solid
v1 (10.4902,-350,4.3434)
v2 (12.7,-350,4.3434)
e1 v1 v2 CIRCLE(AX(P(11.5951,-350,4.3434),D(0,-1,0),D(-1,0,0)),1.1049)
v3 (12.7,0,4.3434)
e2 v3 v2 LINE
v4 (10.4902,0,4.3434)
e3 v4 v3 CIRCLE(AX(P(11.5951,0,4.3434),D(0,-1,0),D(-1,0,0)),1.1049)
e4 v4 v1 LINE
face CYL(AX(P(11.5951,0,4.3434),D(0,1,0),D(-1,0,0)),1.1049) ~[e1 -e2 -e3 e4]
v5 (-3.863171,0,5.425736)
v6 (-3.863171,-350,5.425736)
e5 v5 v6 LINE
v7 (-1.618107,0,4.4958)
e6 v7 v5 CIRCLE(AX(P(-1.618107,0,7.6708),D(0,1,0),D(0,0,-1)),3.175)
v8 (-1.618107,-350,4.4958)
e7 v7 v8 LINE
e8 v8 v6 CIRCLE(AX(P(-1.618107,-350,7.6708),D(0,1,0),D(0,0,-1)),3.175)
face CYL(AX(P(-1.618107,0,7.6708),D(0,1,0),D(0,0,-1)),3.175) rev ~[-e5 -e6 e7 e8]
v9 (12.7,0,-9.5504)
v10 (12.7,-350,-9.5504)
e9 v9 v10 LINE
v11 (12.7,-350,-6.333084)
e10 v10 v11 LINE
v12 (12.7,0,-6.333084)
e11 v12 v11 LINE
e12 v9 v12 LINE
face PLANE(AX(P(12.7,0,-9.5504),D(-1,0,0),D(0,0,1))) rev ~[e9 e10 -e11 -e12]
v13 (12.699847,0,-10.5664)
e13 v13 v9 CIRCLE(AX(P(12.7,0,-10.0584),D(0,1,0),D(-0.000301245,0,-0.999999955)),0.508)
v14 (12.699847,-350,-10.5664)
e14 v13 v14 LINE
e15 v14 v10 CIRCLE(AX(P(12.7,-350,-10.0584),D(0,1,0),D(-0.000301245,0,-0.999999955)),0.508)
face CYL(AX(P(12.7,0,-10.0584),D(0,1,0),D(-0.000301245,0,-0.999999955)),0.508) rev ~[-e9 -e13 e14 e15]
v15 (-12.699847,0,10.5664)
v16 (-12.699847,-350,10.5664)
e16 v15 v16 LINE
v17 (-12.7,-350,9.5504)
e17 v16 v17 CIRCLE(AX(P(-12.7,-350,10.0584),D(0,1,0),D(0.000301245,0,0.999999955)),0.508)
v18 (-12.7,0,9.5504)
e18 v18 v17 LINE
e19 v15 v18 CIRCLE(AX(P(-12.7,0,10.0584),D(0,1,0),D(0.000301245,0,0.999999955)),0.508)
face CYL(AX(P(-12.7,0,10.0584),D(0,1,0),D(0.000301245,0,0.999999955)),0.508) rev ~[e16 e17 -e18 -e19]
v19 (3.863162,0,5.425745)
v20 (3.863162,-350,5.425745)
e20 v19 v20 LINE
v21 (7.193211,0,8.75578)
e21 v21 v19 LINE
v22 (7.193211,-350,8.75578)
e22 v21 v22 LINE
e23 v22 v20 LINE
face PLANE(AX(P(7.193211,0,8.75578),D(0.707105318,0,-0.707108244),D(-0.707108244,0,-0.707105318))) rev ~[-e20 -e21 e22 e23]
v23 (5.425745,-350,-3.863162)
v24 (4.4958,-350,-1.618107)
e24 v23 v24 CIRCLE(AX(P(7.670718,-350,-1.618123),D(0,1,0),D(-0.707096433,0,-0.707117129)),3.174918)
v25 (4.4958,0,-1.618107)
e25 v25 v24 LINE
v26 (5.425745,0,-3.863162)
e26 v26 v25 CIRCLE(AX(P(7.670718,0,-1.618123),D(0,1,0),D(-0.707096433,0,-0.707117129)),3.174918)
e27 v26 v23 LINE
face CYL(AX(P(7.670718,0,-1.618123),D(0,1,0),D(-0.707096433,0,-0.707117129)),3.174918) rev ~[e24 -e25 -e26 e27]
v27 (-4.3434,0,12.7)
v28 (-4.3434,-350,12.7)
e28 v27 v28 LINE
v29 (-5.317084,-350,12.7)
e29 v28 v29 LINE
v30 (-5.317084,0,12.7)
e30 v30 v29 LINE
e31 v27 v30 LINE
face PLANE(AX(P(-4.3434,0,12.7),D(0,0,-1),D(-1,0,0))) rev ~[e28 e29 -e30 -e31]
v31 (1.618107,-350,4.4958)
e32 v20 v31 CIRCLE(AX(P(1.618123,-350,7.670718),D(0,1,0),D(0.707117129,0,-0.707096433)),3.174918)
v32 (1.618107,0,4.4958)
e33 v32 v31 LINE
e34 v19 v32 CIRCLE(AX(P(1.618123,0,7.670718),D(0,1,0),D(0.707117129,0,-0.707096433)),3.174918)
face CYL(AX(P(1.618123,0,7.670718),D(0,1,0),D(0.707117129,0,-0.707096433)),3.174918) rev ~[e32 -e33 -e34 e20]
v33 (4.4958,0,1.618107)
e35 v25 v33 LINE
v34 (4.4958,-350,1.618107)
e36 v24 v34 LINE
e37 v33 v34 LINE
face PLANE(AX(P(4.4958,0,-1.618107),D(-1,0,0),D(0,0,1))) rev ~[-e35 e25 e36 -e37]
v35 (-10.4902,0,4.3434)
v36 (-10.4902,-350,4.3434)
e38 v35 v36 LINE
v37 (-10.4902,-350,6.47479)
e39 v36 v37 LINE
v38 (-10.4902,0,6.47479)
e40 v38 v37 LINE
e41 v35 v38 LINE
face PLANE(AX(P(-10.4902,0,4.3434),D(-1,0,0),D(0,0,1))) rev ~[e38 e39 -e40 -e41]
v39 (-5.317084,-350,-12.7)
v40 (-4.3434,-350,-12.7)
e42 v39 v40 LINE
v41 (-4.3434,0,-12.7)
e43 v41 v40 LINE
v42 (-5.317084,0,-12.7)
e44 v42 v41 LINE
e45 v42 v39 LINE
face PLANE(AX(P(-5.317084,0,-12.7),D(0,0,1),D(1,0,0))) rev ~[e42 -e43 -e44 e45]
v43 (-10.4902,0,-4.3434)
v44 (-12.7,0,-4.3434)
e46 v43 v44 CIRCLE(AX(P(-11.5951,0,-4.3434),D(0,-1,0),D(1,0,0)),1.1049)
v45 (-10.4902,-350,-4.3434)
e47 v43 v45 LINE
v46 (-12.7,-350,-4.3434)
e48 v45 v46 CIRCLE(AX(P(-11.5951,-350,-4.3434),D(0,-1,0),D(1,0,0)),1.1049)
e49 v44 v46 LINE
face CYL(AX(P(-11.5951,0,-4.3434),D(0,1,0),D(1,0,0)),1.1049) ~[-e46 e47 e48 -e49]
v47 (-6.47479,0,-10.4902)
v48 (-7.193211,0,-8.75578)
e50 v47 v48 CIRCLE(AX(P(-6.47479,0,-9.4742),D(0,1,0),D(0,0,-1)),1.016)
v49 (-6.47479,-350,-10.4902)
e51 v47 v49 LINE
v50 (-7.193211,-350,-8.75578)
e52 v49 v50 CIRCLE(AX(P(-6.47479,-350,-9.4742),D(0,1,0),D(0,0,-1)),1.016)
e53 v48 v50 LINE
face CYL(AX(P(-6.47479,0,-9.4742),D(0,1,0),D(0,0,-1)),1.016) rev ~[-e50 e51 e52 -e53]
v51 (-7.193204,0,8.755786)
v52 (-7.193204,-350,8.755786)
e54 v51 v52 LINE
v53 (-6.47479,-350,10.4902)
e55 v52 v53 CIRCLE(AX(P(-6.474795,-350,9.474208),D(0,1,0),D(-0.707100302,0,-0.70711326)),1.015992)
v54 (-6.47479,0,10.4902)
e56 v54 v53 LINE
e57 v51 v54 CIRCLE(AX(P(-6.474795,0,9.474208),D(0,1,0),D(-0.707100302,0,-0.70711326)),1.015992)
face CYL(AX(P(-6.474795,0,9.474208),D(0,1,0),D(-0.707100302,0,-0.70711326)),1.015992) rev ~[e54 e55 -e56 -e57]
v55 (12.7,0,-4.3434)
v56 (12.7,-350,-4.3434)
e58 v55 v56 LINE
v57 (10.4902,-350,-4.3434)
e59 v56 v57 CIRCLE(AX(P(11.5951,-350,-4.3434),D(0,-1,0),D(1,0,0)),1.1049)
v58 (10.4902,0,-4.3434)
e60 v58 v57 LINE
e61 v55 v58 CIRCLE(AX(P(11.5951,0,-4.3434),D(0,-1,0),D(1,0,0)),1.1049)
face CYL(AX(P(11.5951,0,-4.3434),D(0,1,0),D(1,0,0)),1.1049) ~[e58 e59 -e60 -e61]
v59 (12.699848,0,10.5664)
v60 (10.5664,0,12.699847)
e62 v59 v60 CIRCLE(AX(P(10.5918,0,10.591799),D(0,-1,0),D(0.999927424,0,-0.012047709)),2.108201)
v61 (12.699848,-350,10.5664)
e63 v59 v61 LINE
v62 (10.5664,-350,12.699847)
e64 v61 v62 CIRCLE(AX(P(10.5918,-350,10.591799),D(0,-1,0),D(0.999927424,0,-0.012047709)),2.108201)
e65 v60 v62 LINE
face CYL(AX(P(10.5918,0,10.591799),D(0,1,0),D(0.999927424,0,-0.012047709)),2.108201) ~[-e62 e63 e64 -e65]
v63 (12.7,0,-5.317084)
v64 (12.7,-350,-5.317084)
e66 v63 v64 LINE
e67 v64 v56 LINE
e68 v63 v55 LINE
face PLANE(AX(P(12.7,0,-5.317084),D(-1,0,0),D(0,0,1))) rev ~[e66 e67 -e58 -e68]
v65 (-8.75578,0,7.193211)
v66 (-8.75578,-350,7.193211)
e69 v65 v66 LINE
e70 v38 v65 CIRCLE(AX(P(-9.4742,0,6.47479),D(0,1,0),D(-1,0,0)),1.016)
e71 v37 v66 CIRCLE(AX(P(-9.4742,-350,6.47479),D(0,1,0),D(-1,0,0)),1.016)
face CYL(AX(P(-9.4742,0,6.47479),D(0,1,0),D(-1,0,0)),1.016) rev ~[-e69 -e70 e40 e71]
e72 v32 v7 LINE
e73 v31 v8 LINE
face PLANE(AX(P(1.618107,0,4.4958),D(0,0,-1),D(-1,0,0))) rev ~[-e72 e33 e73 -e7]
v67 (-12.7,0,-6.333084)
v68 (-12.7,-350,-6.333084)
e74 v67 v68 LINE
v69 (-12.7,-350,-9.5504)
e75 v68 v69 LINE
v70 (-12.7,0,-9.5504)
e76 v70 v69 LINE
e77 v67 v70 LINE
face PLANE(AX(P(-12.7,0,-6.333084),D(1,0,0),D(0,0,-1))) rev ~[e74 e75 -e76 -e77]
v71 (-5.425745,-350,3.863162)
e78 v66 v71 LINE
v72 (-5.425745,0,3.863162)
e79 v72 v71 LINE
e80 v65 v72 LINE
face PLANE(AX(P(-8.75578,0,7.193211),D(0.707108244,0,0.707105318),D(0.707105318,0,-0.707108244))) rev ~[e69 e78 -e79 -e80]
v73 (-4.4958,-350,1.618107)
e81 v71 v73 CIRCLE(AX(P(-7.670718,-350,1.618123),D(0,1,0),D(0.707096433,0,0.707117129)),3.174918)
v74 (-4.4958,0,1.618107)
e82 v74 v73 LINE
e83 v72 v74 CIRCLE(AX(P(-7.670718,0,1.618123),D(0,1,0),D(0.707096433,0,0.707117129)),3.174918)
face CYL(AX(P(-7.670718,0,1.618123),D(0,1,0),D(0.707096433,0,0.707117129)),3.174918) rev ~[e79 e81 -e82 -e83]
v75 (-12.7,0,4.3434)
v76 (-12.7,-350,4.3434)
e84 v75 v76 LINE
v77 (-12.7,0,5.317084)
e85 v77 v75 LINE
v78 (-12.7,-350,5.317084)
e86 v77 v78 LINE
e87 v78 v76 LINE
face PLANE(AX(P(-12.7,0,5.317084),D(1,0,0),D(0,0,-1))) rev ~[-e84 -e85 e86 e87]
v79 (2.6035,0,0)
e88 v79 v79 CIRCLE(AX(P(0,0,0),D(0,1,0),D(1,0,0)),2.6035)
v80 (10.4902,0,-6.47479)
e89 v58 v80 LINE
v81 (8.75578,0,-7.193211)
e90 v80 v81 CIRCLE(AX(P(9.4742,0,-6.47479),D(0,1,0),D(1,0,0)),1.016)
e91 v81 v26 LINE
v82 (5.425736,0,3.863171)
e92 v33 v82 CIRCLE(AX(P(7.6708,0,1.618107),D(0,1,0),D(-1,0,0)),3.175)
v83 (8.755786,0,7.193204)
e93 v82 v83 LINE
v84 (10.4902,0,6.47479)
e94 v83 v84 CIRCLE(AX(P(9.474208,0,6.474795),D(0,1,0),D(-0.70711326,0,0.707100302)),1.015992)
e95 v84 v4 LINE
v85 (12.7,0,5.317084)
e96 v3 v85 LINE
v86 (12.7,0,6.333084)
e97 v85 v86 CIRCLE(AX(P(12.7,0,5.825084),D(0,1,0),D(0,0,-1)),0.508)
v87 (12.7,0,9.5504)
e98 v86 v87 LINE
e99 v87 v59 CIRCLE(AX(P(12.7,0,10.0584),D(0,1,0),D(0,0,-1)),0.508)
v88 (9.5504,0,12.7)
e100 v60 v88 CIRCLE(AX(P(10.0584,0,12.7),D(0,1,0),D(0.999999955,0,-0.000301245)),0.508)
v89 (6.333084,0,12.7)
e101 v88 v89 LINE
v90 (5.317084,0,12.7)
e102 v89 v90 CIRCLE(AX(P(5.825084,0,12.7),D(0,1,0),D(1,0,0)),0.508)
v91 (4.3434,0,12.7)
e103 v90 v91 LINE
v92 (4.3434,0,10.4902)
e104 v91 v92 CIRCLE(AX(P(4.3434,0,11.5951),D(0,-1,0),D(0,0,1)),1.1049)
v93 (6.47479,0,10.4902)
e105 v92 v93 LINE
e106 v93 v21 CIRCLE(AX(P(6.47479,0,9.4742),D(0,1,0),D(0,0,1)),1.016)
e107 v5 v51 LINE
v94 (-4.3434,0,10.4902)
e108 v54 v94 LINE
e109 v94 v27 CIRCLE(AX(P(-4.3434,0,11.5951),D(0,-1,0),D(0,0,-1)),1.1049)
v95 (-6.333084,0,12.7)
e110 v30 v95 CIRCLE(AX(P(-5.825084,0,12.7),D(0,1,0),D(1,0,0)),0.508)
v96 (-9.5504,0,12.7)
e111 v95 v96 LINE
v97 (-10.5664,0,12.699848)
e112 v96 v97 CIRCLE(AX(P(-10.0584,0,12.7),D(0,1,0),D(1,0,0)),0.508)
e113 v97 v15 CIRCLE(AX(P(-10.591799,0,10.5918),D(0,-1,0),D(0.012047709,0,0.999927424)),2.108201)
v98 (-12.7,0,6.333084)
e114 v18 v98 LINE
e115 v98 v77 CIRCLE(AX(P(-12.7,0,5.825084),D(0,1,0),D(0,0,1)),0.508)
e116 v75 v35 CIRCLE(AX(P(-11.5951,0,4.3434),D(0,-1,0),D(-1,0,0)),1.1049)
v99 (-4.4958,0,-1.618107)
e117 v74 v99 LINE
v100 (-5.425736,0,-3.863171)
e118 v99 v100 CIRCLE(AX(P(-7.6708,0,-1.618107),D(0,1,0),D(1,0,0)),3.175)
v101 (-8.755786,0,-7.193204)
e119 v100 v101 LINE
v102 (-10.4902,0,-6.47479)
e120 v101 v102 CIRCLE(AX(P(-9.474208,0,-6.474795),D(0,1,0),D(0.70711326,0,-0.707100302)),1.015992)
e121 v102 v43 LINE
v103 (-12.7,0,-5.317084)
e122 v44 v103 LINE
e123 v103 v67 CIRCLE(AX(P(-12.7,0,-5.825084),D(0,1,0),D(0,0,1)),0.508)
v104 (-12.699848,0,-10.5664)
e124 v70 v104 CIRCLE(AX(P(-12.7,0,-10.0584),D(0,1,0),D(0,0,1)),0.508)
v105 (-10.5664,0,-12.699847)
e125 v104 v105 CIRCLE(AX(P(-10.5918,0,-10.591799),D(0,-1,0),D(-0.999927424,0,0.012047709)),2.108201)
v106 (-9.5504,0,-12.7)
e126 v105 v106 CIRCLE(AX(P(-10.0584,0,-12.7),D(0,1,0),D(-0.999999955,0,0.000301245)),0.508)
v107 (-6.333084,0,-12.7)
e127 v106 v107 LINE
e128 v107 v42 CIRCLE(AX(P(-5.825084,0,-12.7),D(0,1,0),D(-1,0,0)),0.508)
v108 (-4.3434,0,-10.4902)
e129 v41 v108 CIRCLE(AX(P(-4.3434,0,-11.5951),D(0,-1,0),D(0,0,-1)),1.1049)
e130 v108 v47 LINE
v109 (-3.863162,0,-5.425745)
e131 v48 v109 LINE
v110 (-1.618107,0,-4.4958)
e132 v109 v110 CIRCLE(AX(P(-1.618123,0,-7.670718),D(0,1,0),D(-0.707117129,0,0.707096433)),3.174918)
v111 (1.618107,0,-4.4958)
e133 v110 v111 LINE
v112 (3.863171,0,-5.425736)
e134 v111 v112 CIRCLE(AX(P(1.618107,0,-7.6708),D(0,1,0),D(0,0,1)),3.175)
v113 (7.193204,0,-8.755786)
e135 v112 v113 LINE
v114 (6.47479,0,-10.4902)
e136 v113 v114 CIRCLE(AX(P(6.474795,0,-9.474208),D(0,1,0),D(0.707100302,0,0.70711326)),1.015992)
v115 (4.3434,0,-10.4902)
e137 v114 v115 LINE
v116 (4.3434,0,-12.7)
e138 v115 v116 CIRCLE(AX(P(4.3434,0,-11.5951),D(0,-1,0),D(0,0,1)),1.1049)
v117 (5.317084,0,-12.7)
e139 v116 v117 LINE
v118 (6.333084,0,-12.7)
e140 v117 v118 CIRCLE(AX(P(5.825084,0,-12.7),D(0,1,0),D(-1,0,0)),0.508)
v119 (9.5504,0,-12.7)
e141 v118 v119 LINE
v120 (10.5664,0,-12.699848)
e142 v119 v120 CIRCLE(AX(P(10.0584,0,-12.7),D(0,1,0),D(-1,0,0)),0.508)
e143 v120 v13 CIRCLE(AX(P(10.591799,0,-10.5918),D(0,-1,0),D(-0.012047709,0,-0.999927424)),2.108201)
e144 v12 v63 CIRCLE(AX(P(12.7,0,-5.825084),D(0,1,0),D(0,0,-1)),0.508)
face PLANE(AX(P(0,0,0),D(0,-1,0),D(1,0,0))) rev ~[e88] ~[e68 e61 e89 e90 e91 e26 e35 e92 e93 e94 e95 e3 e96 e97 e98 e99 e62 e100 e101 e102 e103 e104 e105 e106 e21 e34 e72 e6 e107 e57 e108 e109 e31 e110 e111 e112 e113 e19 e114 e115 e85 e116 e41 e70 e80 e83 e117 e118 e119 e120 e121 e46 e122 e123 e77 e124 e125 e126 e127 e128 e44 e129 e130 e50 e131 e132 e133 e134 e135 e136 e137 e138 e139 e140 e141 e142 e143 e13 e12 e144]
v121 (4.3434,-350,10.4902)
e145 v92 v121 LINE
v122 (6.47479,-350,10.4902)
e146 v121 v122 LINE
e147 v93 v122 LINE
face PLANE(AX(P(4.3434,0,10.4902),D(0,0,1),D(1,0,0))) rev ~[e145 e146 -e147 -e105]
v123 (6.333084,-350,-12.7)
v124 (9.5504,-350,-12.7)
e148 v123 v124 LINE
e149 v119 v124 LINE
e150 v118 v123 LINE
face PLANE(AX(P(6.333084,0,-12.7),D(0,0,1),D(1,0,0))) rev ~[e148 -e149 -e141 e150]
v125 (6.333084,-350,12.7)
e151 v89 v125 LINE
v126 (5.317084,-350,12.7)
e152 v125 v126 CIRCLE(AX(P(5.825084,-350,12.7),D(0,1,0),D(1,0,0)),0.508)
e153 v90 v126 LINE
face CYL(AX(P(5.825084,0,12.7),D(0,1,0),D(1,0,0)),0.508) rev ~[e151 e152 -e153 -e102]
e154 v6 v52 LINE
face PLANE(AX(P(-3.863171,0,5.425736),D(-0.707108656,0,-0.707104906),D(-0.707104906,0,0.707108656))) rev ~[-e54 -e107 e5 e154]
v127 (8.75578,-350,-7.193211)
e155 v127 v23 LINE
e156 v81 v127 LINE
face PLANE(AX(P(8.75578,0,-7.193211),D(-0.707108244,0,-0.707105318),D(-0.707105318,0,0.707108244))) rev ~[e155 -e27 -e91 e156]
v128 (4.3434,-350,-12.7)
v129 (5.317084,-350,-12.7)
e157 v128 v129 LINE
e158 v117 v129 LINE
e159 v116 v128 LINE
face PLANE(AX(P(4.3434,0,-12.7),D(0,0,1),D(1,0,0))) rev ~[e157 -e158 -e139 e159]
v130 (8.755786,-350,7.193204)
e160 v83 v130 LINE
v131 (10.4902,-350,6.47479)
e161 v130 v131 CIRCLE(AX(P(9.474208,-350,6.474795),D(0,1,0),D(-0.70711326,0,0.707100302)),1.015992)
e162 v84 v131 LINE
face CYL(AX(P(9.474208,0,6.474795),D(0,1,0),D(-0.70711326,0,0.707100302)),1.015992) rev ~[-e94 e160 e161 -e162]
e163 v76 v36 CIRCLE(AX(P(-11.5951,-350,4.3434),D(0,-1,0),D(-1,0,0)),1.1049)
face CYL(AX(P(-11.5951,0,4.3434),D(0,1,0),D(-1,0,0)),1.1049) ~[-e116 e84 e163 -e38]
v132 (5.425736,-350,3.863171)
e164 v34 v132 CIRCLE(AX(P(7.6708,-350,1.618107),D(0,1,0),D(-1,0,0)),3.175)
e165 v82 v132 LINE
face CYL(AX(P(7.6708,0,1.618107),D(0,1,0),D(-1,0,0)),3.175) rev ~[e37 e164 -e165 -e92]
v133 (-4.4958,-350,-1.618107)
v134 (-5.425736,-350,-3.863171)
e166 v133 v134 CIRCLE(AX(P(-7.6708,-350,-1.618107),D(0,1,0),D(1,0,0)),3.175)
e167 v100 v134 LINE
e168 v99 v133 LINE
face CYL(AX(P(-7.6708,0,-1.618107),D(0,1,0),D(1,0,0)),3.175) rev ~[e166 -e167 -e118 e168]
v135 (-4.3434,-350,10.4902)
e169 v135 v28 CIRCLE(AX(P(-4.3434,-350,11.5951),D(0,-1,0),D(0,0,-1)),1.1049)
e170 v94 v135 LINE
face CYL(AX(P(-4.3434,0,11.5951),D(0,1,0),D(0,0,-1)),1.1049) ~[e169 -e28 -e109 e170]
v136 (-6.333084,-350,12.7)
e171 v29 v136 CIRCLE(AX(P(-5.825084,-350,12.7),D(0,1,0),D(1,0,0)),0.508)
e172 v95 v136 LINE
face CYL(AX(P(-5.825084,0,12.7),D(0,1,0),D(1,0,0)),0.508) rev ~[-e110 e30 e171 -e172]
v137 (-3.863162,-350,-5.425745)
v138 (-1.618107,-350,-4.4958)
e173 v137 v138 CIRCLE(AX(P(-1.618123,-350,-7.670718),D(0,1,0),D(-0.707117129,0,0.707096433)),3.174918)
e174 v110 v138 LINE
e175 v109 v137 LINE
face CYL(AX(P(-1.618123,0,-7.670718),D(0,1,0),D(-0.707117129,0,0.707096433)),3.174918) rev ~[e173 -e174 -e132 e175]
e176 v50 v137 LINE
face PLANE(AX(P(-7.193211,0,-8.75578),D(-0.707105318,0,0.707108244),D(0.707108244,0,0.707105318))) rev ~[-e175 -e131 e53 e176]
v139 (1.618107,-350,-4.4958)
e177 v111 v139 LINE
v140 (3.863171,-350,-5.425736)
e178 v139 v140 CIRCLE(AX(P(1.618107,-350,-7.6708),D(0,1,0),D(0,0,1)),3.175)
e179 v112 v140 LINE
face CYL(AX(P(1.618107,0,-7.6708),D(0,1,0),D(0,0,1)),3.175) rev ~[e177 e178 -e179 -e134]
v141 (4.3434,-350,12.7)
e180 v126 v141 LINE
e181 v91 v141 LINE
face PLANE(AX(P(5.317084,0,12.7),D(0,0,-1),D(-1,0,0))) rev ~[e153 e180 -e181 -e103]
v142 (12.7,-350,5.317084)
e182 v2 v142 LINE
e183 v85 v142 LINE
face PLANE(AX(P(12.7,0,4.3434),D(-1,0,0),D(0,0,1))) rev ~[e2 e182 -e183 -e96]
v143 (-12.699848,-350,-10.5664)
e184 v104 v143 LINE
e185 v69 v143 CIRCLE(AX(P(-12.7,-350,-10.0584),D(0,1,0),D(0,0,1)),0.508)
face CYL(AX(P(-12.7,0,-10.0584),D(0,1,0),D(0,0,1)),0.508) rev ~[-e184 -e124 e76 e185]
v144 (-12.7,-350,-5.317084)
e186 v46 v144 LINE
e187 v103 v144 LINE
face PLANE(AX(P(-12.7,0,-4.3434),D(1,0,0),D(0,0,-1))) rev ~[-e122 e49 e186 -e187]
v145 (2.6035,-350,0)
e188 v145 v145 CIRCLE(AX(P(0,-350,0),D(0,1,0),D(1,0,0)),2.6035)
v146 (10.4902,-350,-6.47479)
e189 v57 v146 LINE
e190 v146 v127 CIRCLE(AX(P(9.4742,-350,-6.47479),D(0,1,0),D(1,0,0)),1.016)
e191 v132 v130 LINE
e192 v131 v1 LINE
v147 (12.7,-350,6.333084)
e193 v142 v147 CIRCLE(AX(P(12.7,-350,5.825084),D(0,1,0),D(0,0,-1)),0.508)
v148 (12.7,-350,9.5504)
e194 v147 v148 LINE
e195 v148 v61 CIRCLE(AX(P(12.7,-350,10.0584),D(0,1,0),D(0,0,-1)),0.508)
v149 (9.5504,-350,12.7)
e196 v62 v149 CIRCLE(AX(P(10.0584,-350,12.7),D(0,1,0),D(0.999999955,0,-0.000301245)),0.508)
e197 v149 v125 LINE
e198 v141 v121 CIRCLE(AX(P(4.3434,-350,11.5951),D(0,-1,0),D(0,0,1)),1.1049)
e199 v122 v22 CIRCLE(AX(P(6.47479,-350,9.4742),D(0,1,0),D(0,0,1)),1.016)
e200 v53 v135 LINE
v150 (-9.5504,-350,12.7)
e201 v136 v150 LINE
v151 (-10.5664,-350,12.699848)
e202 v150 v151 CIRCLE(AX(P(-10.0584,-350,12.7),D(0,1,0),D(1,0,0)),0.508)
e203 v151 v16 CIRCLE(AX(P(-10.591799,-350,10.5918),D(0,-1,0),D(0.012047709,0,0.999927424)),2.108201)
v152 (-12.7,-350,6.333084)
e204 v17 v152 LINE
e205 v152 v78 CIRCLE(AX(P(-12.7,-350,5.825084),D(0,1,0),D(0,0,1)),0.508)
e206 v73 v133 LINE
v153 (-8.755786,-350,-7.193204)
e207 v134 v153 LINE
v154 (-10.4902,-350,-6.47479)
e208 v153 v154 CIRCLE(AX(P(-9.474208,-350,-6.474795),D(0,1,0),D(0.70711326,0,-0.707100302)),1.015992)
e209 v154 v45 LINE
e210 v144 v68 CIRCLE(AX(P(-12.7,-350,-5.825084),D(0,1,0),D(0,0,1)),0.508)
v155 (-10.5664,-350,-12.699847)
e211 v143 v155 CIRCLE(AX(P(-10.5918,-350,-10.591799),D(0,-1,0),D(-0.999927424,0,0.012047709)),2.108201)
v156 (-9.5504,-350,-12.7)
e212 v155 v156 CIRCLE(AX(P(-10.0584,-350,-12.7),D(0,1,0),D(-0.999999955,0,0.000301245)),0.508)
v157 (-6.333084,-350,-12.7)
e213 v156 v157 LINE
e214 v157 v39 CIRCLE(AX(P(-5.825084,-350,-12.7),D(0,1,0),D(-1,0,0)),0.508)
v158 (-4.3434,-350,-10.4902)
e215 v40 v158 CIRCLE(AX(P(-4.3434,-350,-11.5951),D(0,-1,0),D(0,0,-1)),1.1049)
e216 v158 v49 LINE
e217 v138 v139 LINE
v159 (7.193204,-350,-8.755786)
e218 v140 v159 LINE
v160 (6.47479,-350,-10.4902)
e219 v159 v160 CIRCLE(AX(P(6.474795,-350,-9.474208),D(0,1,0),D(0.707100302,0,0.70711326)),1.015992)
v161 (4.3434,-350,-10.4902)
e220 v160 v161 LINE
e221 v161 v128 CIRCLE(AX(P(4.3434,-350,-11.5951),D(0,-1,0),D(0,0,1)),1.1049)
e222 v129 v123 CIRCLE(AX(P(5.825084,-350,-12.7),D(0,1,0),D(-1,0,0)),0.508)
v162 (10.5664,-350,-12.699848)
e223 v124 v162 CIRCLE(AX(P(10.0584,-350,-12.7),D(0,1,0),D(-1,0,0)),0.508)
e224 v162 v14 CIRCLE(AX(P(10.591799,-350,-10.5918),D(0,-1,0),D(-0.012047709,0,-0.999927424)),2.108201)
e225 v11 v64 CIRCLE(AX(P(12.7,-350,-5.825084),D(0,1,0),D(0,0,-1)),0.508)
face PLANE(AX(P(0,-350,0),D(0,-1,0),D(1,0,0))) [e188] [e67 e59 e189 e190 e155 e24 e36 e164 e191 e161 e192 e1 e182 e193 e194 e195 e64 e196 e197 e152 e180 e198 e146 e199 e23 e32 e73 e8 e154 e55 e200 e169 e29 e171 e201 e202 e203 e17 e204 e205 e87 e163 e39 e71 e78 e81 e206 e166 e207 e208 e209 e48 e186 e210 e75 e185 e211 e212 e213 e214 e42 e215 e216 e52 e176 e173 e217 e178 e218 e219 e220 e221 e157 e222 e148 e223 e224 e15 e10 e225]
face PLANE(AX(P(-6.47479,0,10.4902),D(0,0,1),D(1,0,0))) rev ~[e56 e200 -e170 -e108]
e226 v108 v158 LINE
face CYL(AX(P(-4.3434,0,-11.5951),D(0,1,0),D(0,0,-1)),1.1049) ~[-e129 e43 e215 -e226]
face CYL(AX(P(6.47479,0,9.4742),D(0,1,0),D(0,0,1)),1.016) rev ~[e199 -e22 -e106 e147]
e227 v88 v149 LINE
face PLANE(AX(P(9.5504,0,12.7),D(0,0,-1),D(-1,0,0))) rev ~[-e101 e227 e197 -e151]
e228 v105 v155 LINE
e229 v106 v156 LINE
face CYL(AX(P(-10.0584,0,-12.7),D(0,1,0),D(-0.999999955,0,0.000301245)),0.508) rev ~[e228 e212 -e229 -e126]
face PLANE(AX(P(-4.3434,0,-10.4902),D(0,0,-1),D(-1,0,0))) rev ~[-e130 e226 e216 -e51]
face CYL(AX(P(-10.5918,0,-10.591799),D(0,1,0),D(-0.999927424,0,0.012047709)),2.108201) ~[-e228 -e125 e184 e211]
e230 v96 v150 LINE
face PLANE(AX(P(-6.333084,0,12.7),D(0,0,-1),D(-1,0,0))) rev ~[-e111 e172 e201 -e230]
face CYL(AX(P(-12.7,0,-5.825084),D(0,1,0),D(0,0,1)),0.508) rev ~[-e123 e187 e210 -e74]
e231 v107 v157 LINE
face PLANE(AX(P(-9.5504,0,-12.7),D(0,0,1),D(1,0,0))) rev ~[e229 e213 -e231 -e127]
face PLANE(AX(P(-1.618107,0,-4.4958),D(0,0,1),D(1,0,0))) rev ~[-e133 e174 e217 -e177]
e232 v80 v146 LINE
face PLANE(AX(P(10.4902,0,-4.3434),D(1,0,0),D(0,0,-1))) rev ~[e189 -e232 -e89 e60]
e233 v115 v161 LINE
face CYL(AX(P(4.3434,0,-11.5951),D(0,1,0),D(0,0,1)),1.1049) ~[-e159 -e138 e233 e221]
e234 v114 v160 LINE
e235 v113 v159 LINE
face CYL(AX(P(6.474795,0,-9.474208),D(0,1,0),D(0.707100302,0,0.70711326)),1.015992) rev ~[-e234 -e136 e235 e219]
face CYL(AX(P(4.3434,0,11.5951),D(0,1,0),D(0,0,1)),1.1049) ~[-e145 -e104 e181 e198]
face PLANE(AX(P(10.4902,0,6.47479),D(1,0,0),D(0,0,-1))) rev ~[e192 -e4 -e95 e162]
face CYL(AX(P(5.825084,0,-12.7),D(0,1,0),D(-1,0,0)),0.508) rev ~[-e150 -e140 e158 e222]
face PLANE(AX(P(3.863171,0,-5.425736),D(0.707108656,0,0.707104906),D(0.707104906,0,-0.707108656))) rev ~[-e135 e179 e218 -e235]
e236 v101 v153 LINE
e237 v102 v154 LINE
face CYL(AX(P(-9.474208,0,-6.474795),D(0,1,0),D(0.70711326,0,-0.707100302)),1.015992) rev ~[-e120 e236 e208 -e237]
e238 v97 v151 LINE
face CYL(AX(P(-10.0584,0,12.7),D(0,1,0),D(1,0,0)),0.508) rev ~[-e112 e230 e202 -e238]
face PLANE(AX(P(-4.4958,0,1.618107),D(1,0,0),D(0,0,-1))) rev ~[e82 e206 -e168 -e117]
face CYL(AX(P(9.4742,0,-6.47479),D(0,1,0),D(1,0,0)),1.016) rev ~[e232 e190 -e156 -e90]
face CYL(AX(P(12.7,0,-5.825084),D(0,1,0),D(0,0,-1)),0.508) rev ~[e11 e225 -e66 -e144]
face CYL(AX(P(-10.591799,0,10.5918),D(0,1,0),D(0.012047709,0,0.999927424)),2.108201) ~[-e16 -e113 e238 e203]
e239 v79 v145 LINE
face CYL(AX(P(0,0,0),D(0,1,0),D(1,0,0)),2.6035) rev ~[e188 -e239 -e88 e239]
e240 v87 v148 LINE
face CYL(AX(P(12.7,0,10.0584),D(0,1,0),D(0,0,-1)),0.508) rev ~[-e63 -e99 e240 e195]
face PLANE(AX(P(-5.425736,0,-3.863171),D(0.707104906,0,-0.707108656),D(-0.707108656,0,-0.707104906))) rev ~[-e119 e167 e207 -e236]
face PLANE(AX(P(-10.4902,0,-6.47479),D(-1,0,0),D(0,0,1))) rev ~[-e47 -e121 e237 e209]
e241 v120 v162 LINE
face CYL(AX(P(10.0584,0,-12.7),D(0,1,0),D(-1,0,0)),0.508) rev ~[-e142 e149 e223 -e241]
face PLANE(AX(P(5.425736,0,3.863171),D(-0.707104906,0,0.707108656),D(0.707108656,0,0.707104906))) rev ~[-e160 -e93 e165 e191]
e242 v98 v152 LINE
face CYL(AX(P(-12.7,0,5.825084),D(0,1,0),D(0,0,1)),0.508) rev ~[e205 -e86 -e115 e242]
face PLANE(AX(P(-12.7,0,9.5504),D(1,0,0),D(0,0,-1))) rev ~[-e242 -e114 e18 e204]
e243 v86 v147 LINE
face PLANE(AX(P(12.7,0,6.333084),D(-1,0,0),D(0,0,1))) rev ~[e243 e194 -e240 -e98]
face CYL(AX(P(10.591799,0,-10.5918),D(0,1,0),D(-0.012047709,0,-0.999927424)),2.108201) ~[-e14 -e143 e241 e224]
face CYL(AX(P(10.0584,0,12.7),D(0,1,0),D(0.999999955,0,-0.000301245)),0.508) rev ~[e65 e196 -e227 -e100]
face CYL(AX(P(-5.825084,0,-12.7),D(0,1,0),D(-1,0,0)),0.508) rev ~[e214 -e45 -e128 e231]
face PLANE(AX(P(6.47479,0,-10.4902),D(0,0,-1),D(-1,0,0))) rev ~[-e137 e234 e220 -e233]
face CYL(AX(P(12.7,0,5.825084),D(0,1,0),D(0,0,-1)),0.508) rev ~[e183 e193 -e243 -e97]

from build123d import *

# Parameters (mm, degrees)
F1_DEPTH = 375
F2_DEPTH = 25


# Not quite as in the source:
# - ends of sketch curves that miss each other by under 0.0002 mm in the source are joined


with BuildPart() as f1:
    # F0 (on Front) → F1 (new body)
    with BuildSketch(Plane.XZ):
        with BuildLine():
            ThreePointArc((-12.7, -9.5504), (-12.1920000057, -10.0583238), (-12.6998476, -10.5663999771))
            ThreePointArc((-12.6998476, -10.5663999771), (-12.0825225161, -12.0825225161), (-10.5664000074, -12.6998469825))
            ThreePointArc((-10.5664000074, -12.6998469825), (-10.0583238, -12.1920000057), (-9.5504, -12.7))
            Line((-9.5504, -12.7), (-6.3330836, -12.7))
            ThreePointArc((-6.3330836, -12.7), (-5.8250836, -12.192), (-5.3170836, -12.7))
            Line((-5.3170836, -12.7), (-4.3434, -12.7))
            ThreePointArc((-4.3434, -12.7), (-3.2385, -11.5951), (-4.3434, -10.4902))
            Line((-4.3434, -10.4902), (-6.4747902, -10.4902))
            ThreePointArc((-6.4747902, -10.4902), (-7.413451805, -9.8630063673), (-7.1932106897, -8.7557795103))
            Line((-7.1932106897, -8.7557795103), (-3.8631622, -5.4257448))
            ThreePointArc((-3.8631622, -5.4257448), (-2.8331268978, -4.7374824843), (-1.618107, -4.4958))
            Line((-1.618107, -4.4958), (1.618107, -4.4958))
            ThreePointArc((1.618107, -4.4958), (2.8331268978, -4.7374824843), (3.8631710303, -5.4257359697))
            Line((3.8631710303, -5.4257359697), (7.1932038, -8.7557864))
            ThreePointArc((7.1932038, -8.7557864), (7.413451805, -9.8630063673), (6.4747902, -10.4902))
            Line((6.4747902, -10.4902), (4.3434, -10.4902))
            ThreePointArc((4.3434, -10.4902), (3.2385, -11.5951), (4.3434, -12.7))
            Line((4.3434, -12.7), (5.3170836, -12.7))
            ThreePointArc((5.3170836, -12.7), (5.8250836, -12.192), (6.3330836, -12.7))
            Line((6.3330836, -12.7), (9.5504, -12.7))
            ThreePointArc((9.5504, -12.7), (10.0583238, -12.1920000057), (10.5663999771, -12.6998476))
            ThreePointArc((10.5663999771, -12.6998476), (12.0825225161, -12.0825225161), (12.6998469825, -10.5664000074))
            ThreePointArc((12.6998469825, -10.5664000074), (12.1920000057, -10.0583238), (12.7, -9.5504))
            Line((12.7, -9.5504), (12.7, -6.3330836))
            ThreePointArc((12.7, -6.3330836), (12.192, -5.8250836), (12.7, -5.3170836))
            Line((12.7, -5.3170836), (12.7, -4.3434))
            ThreePointArc((12.7, -4.3434), (11.5951, -3.2385), (10.4902, -4.3434))
            Line((10.4902, -4.3434), (10.4902, -6.4747902))
            ThreePointArc((10.4902, -6.4747902), (9.8630063673, -7.413451805), (8.7557795103, -7.1932106897))
            Line((8.7557795103, -7.1932106897), (5.4257448, -3.8631622))
            ThreePointArc((5.4257448, -3.8631622), (4.7374824843, -2.8331268978), (4.4958, -1.618107))
            Line((4.4958, -1.618107), (4.4958, 1.618107))
            ThreePointArc((4.4958, 1.618107), (4.7374824843, 2.8331268978), (5.4257359697, 3.8631710303))
            Line((5.4257359697, 3.8631710303), (8.7557864, 7.1932038))
            ThreePointArc((8.7557864, 7.1932038), (9.8630063673, 7.413451805), (10.4902, 6.4747902))
            Line((10.4902, 6.4747902), (10.4902, 4.3434))
            ThreePointArc((10.4902, 4.3434), (11.5951, 3.2385), (12.7, 4.3434))
            Line((12.7, 4.3434), (12.7, 5.3170836))
            ThreePointArc((12.7, 5.3170836), (12.192, 5.8250836), (12.7, 6.3330836))
            Line((12.7, 6.3330836), (12.7, 9.5504))
            ThreePointArc((12.7, 9.5504), (12.1920000057, 10.0583238), (12.6998476, 10.5663999771))
            ThreePointArc((12.6998476, 10.5663999771), (12.0825225161, 12.0825225161), (10.5664000074, 12.6998469825))
            ThreePointArc((10.5664000074, 12.6998469825), (10.0583238, 12.1920000057), (9.5504, 12.7))
            Line((9.5504, 12.7), (6.3330836, 12.7))
            ThreePointArc((6.3330836, 12.7), (5.8250836, 12.192), (5.3170836, 12.7))
            Line((5.3170836, 12.7), (4.3434, 12.7))
            ThreePointArc((4.3434, 12.7), (3.2385, 11.5951), (4.3434, 10.4902))
            Line((4.3434, 10.4902), (6.4747902, 10.4902))
            ThreePointArc((6.4747902, 10.4902), (7.413451805, 9.8630063673), (7.1932106897, 8.7557795103))
            Line((7.1932106897, 8.7557795103), (3.8631622, 5.4257448))
            ThreePointArc((3.8631622, 5.4257448), (2.8331268978, 4.7374824843), (1.618107, 4.4958))
            Line((1.618107, 4.4958), (-1.618107, 4.4958))
            ThreePointArc((-1.618107, 4.4958), (-2.8331268978, 4.7374824843), (-3.8631710303, 5.4257359697))
            Line((-3.8631710303, 5.4257359697), (-7.1932038, 8.7557864))
            ThreePointArc((-7.1932038, 8.7557864), (-7.413451805, 9.8630063673), (-6.4747902, 10.4902))
            Line((-6.4747902, 10.4902), (-4.3434, 10.4902))
            ThreePointArc((-4.3434, 10.4902), (-3.2385, 11.5951), (-4.3434, 12.7))
            Line((-4.3434, 12.7), (-5.3170836, 12.7))
            ThreePointArc((-5.3170836, 12.7), (-5.8250836, 12.192), (-6.3330836, 12.7))
            Line((-6.3330836, 12.7), (-9.5504, 12.7))
            ThreePointArc((-9.5504, 12.7), (-10.0583238, 12.1920000057), (-10.5663999771, 12.6998476))
            ThreePointArc((-10.5663999771, 12.6998476), (-12.0825225161, 12.0825225161), (-12.6998469825, 10.5664000074))
            ThreePointArc((-12.6998469825, 10.5664000074), (-12.1920000057, 10.0583238), (-12.7, 9.5504))
            Line((-12.7, 9.5504), (-12.7, 6.3330836))
            ThreePointArc((-12.7, 6.3330836), (-12.192, 5.8250836), (-12.7, 5.3170836))
            Line((-12.7, 5.3170836), (-12.7, 4.3434))
            ThreePointArc((-12.7, 4.3434), (-11.5951, 3.2385), (-10.4902, 4.3434))
            Line((-10.4902, 4.3434), (-10.4902, 6.4747902))
            ThreePointArc((-10.4902, 6.4747902), (-9.8630063673, 7.413451805), (-8.7557795103, 7.1932106897))
            Line((-8.7557795103, 7.1932106897), (-5.4257448, 3.8631622))
            ThreePointArc((-5.4257448, 3.8631622), (-4.7374824843, 2.8331268978), (-4.4958, 1.618107))
            Line((-4.4958, 1.618107), (-4.4958, -1.618107))
            ThreePointArc((-4.4958, -1.618107), (-4.7374824843, -2.8331268978), (-5.4257359697, -3.8631710303))
            Line((-5.4257359697, -3.8631710303), (-8.7557864, -7.1932038))
            ThreePointArc((-8.7557864, -7.1932038), (-9.8630063673, -7.413451805), (-10.4902, -6.4747902))
            Line((-10.4902, -6.4747902), (-10.4902, -4.3434))
            ThreePointArc((-10.4902, -4.3434), (-11.5951, -3.2385), (-12.7, -4.3434))
            Line((-12.7, -4.3434), (-12.7, -5.3170836))
            ThreePointArc((-12.7, -5.3170836), (-12.192, -5.8250836), (-12.7, -6.3330836))
            Line((-12.7, -6.3330836), (-12.7, -9.5504))
        make_face()
        with BuildLine():
            ThreePointArc((-2.6035, 0), (0, 2.6035), (2.6035, 0))
            ThreePointArc((2.6035, 0), (0, -2.6035), (-2.6035, 0))
        make_face(mode=Mode.SUBTRACT)
    extrude(amount=F1_DEPTH)

    # F2 (cut): a face of the model
    f2_faces = [f1.faces().sort_by_distance(p)[0] for p in [
        (-10.849410262, -375, 5.4090951),
    ]]
    extrude(f2_faces, amount=-F2_DEPTH, mode=Mode.SUBTRACT)


solid = f1.part
